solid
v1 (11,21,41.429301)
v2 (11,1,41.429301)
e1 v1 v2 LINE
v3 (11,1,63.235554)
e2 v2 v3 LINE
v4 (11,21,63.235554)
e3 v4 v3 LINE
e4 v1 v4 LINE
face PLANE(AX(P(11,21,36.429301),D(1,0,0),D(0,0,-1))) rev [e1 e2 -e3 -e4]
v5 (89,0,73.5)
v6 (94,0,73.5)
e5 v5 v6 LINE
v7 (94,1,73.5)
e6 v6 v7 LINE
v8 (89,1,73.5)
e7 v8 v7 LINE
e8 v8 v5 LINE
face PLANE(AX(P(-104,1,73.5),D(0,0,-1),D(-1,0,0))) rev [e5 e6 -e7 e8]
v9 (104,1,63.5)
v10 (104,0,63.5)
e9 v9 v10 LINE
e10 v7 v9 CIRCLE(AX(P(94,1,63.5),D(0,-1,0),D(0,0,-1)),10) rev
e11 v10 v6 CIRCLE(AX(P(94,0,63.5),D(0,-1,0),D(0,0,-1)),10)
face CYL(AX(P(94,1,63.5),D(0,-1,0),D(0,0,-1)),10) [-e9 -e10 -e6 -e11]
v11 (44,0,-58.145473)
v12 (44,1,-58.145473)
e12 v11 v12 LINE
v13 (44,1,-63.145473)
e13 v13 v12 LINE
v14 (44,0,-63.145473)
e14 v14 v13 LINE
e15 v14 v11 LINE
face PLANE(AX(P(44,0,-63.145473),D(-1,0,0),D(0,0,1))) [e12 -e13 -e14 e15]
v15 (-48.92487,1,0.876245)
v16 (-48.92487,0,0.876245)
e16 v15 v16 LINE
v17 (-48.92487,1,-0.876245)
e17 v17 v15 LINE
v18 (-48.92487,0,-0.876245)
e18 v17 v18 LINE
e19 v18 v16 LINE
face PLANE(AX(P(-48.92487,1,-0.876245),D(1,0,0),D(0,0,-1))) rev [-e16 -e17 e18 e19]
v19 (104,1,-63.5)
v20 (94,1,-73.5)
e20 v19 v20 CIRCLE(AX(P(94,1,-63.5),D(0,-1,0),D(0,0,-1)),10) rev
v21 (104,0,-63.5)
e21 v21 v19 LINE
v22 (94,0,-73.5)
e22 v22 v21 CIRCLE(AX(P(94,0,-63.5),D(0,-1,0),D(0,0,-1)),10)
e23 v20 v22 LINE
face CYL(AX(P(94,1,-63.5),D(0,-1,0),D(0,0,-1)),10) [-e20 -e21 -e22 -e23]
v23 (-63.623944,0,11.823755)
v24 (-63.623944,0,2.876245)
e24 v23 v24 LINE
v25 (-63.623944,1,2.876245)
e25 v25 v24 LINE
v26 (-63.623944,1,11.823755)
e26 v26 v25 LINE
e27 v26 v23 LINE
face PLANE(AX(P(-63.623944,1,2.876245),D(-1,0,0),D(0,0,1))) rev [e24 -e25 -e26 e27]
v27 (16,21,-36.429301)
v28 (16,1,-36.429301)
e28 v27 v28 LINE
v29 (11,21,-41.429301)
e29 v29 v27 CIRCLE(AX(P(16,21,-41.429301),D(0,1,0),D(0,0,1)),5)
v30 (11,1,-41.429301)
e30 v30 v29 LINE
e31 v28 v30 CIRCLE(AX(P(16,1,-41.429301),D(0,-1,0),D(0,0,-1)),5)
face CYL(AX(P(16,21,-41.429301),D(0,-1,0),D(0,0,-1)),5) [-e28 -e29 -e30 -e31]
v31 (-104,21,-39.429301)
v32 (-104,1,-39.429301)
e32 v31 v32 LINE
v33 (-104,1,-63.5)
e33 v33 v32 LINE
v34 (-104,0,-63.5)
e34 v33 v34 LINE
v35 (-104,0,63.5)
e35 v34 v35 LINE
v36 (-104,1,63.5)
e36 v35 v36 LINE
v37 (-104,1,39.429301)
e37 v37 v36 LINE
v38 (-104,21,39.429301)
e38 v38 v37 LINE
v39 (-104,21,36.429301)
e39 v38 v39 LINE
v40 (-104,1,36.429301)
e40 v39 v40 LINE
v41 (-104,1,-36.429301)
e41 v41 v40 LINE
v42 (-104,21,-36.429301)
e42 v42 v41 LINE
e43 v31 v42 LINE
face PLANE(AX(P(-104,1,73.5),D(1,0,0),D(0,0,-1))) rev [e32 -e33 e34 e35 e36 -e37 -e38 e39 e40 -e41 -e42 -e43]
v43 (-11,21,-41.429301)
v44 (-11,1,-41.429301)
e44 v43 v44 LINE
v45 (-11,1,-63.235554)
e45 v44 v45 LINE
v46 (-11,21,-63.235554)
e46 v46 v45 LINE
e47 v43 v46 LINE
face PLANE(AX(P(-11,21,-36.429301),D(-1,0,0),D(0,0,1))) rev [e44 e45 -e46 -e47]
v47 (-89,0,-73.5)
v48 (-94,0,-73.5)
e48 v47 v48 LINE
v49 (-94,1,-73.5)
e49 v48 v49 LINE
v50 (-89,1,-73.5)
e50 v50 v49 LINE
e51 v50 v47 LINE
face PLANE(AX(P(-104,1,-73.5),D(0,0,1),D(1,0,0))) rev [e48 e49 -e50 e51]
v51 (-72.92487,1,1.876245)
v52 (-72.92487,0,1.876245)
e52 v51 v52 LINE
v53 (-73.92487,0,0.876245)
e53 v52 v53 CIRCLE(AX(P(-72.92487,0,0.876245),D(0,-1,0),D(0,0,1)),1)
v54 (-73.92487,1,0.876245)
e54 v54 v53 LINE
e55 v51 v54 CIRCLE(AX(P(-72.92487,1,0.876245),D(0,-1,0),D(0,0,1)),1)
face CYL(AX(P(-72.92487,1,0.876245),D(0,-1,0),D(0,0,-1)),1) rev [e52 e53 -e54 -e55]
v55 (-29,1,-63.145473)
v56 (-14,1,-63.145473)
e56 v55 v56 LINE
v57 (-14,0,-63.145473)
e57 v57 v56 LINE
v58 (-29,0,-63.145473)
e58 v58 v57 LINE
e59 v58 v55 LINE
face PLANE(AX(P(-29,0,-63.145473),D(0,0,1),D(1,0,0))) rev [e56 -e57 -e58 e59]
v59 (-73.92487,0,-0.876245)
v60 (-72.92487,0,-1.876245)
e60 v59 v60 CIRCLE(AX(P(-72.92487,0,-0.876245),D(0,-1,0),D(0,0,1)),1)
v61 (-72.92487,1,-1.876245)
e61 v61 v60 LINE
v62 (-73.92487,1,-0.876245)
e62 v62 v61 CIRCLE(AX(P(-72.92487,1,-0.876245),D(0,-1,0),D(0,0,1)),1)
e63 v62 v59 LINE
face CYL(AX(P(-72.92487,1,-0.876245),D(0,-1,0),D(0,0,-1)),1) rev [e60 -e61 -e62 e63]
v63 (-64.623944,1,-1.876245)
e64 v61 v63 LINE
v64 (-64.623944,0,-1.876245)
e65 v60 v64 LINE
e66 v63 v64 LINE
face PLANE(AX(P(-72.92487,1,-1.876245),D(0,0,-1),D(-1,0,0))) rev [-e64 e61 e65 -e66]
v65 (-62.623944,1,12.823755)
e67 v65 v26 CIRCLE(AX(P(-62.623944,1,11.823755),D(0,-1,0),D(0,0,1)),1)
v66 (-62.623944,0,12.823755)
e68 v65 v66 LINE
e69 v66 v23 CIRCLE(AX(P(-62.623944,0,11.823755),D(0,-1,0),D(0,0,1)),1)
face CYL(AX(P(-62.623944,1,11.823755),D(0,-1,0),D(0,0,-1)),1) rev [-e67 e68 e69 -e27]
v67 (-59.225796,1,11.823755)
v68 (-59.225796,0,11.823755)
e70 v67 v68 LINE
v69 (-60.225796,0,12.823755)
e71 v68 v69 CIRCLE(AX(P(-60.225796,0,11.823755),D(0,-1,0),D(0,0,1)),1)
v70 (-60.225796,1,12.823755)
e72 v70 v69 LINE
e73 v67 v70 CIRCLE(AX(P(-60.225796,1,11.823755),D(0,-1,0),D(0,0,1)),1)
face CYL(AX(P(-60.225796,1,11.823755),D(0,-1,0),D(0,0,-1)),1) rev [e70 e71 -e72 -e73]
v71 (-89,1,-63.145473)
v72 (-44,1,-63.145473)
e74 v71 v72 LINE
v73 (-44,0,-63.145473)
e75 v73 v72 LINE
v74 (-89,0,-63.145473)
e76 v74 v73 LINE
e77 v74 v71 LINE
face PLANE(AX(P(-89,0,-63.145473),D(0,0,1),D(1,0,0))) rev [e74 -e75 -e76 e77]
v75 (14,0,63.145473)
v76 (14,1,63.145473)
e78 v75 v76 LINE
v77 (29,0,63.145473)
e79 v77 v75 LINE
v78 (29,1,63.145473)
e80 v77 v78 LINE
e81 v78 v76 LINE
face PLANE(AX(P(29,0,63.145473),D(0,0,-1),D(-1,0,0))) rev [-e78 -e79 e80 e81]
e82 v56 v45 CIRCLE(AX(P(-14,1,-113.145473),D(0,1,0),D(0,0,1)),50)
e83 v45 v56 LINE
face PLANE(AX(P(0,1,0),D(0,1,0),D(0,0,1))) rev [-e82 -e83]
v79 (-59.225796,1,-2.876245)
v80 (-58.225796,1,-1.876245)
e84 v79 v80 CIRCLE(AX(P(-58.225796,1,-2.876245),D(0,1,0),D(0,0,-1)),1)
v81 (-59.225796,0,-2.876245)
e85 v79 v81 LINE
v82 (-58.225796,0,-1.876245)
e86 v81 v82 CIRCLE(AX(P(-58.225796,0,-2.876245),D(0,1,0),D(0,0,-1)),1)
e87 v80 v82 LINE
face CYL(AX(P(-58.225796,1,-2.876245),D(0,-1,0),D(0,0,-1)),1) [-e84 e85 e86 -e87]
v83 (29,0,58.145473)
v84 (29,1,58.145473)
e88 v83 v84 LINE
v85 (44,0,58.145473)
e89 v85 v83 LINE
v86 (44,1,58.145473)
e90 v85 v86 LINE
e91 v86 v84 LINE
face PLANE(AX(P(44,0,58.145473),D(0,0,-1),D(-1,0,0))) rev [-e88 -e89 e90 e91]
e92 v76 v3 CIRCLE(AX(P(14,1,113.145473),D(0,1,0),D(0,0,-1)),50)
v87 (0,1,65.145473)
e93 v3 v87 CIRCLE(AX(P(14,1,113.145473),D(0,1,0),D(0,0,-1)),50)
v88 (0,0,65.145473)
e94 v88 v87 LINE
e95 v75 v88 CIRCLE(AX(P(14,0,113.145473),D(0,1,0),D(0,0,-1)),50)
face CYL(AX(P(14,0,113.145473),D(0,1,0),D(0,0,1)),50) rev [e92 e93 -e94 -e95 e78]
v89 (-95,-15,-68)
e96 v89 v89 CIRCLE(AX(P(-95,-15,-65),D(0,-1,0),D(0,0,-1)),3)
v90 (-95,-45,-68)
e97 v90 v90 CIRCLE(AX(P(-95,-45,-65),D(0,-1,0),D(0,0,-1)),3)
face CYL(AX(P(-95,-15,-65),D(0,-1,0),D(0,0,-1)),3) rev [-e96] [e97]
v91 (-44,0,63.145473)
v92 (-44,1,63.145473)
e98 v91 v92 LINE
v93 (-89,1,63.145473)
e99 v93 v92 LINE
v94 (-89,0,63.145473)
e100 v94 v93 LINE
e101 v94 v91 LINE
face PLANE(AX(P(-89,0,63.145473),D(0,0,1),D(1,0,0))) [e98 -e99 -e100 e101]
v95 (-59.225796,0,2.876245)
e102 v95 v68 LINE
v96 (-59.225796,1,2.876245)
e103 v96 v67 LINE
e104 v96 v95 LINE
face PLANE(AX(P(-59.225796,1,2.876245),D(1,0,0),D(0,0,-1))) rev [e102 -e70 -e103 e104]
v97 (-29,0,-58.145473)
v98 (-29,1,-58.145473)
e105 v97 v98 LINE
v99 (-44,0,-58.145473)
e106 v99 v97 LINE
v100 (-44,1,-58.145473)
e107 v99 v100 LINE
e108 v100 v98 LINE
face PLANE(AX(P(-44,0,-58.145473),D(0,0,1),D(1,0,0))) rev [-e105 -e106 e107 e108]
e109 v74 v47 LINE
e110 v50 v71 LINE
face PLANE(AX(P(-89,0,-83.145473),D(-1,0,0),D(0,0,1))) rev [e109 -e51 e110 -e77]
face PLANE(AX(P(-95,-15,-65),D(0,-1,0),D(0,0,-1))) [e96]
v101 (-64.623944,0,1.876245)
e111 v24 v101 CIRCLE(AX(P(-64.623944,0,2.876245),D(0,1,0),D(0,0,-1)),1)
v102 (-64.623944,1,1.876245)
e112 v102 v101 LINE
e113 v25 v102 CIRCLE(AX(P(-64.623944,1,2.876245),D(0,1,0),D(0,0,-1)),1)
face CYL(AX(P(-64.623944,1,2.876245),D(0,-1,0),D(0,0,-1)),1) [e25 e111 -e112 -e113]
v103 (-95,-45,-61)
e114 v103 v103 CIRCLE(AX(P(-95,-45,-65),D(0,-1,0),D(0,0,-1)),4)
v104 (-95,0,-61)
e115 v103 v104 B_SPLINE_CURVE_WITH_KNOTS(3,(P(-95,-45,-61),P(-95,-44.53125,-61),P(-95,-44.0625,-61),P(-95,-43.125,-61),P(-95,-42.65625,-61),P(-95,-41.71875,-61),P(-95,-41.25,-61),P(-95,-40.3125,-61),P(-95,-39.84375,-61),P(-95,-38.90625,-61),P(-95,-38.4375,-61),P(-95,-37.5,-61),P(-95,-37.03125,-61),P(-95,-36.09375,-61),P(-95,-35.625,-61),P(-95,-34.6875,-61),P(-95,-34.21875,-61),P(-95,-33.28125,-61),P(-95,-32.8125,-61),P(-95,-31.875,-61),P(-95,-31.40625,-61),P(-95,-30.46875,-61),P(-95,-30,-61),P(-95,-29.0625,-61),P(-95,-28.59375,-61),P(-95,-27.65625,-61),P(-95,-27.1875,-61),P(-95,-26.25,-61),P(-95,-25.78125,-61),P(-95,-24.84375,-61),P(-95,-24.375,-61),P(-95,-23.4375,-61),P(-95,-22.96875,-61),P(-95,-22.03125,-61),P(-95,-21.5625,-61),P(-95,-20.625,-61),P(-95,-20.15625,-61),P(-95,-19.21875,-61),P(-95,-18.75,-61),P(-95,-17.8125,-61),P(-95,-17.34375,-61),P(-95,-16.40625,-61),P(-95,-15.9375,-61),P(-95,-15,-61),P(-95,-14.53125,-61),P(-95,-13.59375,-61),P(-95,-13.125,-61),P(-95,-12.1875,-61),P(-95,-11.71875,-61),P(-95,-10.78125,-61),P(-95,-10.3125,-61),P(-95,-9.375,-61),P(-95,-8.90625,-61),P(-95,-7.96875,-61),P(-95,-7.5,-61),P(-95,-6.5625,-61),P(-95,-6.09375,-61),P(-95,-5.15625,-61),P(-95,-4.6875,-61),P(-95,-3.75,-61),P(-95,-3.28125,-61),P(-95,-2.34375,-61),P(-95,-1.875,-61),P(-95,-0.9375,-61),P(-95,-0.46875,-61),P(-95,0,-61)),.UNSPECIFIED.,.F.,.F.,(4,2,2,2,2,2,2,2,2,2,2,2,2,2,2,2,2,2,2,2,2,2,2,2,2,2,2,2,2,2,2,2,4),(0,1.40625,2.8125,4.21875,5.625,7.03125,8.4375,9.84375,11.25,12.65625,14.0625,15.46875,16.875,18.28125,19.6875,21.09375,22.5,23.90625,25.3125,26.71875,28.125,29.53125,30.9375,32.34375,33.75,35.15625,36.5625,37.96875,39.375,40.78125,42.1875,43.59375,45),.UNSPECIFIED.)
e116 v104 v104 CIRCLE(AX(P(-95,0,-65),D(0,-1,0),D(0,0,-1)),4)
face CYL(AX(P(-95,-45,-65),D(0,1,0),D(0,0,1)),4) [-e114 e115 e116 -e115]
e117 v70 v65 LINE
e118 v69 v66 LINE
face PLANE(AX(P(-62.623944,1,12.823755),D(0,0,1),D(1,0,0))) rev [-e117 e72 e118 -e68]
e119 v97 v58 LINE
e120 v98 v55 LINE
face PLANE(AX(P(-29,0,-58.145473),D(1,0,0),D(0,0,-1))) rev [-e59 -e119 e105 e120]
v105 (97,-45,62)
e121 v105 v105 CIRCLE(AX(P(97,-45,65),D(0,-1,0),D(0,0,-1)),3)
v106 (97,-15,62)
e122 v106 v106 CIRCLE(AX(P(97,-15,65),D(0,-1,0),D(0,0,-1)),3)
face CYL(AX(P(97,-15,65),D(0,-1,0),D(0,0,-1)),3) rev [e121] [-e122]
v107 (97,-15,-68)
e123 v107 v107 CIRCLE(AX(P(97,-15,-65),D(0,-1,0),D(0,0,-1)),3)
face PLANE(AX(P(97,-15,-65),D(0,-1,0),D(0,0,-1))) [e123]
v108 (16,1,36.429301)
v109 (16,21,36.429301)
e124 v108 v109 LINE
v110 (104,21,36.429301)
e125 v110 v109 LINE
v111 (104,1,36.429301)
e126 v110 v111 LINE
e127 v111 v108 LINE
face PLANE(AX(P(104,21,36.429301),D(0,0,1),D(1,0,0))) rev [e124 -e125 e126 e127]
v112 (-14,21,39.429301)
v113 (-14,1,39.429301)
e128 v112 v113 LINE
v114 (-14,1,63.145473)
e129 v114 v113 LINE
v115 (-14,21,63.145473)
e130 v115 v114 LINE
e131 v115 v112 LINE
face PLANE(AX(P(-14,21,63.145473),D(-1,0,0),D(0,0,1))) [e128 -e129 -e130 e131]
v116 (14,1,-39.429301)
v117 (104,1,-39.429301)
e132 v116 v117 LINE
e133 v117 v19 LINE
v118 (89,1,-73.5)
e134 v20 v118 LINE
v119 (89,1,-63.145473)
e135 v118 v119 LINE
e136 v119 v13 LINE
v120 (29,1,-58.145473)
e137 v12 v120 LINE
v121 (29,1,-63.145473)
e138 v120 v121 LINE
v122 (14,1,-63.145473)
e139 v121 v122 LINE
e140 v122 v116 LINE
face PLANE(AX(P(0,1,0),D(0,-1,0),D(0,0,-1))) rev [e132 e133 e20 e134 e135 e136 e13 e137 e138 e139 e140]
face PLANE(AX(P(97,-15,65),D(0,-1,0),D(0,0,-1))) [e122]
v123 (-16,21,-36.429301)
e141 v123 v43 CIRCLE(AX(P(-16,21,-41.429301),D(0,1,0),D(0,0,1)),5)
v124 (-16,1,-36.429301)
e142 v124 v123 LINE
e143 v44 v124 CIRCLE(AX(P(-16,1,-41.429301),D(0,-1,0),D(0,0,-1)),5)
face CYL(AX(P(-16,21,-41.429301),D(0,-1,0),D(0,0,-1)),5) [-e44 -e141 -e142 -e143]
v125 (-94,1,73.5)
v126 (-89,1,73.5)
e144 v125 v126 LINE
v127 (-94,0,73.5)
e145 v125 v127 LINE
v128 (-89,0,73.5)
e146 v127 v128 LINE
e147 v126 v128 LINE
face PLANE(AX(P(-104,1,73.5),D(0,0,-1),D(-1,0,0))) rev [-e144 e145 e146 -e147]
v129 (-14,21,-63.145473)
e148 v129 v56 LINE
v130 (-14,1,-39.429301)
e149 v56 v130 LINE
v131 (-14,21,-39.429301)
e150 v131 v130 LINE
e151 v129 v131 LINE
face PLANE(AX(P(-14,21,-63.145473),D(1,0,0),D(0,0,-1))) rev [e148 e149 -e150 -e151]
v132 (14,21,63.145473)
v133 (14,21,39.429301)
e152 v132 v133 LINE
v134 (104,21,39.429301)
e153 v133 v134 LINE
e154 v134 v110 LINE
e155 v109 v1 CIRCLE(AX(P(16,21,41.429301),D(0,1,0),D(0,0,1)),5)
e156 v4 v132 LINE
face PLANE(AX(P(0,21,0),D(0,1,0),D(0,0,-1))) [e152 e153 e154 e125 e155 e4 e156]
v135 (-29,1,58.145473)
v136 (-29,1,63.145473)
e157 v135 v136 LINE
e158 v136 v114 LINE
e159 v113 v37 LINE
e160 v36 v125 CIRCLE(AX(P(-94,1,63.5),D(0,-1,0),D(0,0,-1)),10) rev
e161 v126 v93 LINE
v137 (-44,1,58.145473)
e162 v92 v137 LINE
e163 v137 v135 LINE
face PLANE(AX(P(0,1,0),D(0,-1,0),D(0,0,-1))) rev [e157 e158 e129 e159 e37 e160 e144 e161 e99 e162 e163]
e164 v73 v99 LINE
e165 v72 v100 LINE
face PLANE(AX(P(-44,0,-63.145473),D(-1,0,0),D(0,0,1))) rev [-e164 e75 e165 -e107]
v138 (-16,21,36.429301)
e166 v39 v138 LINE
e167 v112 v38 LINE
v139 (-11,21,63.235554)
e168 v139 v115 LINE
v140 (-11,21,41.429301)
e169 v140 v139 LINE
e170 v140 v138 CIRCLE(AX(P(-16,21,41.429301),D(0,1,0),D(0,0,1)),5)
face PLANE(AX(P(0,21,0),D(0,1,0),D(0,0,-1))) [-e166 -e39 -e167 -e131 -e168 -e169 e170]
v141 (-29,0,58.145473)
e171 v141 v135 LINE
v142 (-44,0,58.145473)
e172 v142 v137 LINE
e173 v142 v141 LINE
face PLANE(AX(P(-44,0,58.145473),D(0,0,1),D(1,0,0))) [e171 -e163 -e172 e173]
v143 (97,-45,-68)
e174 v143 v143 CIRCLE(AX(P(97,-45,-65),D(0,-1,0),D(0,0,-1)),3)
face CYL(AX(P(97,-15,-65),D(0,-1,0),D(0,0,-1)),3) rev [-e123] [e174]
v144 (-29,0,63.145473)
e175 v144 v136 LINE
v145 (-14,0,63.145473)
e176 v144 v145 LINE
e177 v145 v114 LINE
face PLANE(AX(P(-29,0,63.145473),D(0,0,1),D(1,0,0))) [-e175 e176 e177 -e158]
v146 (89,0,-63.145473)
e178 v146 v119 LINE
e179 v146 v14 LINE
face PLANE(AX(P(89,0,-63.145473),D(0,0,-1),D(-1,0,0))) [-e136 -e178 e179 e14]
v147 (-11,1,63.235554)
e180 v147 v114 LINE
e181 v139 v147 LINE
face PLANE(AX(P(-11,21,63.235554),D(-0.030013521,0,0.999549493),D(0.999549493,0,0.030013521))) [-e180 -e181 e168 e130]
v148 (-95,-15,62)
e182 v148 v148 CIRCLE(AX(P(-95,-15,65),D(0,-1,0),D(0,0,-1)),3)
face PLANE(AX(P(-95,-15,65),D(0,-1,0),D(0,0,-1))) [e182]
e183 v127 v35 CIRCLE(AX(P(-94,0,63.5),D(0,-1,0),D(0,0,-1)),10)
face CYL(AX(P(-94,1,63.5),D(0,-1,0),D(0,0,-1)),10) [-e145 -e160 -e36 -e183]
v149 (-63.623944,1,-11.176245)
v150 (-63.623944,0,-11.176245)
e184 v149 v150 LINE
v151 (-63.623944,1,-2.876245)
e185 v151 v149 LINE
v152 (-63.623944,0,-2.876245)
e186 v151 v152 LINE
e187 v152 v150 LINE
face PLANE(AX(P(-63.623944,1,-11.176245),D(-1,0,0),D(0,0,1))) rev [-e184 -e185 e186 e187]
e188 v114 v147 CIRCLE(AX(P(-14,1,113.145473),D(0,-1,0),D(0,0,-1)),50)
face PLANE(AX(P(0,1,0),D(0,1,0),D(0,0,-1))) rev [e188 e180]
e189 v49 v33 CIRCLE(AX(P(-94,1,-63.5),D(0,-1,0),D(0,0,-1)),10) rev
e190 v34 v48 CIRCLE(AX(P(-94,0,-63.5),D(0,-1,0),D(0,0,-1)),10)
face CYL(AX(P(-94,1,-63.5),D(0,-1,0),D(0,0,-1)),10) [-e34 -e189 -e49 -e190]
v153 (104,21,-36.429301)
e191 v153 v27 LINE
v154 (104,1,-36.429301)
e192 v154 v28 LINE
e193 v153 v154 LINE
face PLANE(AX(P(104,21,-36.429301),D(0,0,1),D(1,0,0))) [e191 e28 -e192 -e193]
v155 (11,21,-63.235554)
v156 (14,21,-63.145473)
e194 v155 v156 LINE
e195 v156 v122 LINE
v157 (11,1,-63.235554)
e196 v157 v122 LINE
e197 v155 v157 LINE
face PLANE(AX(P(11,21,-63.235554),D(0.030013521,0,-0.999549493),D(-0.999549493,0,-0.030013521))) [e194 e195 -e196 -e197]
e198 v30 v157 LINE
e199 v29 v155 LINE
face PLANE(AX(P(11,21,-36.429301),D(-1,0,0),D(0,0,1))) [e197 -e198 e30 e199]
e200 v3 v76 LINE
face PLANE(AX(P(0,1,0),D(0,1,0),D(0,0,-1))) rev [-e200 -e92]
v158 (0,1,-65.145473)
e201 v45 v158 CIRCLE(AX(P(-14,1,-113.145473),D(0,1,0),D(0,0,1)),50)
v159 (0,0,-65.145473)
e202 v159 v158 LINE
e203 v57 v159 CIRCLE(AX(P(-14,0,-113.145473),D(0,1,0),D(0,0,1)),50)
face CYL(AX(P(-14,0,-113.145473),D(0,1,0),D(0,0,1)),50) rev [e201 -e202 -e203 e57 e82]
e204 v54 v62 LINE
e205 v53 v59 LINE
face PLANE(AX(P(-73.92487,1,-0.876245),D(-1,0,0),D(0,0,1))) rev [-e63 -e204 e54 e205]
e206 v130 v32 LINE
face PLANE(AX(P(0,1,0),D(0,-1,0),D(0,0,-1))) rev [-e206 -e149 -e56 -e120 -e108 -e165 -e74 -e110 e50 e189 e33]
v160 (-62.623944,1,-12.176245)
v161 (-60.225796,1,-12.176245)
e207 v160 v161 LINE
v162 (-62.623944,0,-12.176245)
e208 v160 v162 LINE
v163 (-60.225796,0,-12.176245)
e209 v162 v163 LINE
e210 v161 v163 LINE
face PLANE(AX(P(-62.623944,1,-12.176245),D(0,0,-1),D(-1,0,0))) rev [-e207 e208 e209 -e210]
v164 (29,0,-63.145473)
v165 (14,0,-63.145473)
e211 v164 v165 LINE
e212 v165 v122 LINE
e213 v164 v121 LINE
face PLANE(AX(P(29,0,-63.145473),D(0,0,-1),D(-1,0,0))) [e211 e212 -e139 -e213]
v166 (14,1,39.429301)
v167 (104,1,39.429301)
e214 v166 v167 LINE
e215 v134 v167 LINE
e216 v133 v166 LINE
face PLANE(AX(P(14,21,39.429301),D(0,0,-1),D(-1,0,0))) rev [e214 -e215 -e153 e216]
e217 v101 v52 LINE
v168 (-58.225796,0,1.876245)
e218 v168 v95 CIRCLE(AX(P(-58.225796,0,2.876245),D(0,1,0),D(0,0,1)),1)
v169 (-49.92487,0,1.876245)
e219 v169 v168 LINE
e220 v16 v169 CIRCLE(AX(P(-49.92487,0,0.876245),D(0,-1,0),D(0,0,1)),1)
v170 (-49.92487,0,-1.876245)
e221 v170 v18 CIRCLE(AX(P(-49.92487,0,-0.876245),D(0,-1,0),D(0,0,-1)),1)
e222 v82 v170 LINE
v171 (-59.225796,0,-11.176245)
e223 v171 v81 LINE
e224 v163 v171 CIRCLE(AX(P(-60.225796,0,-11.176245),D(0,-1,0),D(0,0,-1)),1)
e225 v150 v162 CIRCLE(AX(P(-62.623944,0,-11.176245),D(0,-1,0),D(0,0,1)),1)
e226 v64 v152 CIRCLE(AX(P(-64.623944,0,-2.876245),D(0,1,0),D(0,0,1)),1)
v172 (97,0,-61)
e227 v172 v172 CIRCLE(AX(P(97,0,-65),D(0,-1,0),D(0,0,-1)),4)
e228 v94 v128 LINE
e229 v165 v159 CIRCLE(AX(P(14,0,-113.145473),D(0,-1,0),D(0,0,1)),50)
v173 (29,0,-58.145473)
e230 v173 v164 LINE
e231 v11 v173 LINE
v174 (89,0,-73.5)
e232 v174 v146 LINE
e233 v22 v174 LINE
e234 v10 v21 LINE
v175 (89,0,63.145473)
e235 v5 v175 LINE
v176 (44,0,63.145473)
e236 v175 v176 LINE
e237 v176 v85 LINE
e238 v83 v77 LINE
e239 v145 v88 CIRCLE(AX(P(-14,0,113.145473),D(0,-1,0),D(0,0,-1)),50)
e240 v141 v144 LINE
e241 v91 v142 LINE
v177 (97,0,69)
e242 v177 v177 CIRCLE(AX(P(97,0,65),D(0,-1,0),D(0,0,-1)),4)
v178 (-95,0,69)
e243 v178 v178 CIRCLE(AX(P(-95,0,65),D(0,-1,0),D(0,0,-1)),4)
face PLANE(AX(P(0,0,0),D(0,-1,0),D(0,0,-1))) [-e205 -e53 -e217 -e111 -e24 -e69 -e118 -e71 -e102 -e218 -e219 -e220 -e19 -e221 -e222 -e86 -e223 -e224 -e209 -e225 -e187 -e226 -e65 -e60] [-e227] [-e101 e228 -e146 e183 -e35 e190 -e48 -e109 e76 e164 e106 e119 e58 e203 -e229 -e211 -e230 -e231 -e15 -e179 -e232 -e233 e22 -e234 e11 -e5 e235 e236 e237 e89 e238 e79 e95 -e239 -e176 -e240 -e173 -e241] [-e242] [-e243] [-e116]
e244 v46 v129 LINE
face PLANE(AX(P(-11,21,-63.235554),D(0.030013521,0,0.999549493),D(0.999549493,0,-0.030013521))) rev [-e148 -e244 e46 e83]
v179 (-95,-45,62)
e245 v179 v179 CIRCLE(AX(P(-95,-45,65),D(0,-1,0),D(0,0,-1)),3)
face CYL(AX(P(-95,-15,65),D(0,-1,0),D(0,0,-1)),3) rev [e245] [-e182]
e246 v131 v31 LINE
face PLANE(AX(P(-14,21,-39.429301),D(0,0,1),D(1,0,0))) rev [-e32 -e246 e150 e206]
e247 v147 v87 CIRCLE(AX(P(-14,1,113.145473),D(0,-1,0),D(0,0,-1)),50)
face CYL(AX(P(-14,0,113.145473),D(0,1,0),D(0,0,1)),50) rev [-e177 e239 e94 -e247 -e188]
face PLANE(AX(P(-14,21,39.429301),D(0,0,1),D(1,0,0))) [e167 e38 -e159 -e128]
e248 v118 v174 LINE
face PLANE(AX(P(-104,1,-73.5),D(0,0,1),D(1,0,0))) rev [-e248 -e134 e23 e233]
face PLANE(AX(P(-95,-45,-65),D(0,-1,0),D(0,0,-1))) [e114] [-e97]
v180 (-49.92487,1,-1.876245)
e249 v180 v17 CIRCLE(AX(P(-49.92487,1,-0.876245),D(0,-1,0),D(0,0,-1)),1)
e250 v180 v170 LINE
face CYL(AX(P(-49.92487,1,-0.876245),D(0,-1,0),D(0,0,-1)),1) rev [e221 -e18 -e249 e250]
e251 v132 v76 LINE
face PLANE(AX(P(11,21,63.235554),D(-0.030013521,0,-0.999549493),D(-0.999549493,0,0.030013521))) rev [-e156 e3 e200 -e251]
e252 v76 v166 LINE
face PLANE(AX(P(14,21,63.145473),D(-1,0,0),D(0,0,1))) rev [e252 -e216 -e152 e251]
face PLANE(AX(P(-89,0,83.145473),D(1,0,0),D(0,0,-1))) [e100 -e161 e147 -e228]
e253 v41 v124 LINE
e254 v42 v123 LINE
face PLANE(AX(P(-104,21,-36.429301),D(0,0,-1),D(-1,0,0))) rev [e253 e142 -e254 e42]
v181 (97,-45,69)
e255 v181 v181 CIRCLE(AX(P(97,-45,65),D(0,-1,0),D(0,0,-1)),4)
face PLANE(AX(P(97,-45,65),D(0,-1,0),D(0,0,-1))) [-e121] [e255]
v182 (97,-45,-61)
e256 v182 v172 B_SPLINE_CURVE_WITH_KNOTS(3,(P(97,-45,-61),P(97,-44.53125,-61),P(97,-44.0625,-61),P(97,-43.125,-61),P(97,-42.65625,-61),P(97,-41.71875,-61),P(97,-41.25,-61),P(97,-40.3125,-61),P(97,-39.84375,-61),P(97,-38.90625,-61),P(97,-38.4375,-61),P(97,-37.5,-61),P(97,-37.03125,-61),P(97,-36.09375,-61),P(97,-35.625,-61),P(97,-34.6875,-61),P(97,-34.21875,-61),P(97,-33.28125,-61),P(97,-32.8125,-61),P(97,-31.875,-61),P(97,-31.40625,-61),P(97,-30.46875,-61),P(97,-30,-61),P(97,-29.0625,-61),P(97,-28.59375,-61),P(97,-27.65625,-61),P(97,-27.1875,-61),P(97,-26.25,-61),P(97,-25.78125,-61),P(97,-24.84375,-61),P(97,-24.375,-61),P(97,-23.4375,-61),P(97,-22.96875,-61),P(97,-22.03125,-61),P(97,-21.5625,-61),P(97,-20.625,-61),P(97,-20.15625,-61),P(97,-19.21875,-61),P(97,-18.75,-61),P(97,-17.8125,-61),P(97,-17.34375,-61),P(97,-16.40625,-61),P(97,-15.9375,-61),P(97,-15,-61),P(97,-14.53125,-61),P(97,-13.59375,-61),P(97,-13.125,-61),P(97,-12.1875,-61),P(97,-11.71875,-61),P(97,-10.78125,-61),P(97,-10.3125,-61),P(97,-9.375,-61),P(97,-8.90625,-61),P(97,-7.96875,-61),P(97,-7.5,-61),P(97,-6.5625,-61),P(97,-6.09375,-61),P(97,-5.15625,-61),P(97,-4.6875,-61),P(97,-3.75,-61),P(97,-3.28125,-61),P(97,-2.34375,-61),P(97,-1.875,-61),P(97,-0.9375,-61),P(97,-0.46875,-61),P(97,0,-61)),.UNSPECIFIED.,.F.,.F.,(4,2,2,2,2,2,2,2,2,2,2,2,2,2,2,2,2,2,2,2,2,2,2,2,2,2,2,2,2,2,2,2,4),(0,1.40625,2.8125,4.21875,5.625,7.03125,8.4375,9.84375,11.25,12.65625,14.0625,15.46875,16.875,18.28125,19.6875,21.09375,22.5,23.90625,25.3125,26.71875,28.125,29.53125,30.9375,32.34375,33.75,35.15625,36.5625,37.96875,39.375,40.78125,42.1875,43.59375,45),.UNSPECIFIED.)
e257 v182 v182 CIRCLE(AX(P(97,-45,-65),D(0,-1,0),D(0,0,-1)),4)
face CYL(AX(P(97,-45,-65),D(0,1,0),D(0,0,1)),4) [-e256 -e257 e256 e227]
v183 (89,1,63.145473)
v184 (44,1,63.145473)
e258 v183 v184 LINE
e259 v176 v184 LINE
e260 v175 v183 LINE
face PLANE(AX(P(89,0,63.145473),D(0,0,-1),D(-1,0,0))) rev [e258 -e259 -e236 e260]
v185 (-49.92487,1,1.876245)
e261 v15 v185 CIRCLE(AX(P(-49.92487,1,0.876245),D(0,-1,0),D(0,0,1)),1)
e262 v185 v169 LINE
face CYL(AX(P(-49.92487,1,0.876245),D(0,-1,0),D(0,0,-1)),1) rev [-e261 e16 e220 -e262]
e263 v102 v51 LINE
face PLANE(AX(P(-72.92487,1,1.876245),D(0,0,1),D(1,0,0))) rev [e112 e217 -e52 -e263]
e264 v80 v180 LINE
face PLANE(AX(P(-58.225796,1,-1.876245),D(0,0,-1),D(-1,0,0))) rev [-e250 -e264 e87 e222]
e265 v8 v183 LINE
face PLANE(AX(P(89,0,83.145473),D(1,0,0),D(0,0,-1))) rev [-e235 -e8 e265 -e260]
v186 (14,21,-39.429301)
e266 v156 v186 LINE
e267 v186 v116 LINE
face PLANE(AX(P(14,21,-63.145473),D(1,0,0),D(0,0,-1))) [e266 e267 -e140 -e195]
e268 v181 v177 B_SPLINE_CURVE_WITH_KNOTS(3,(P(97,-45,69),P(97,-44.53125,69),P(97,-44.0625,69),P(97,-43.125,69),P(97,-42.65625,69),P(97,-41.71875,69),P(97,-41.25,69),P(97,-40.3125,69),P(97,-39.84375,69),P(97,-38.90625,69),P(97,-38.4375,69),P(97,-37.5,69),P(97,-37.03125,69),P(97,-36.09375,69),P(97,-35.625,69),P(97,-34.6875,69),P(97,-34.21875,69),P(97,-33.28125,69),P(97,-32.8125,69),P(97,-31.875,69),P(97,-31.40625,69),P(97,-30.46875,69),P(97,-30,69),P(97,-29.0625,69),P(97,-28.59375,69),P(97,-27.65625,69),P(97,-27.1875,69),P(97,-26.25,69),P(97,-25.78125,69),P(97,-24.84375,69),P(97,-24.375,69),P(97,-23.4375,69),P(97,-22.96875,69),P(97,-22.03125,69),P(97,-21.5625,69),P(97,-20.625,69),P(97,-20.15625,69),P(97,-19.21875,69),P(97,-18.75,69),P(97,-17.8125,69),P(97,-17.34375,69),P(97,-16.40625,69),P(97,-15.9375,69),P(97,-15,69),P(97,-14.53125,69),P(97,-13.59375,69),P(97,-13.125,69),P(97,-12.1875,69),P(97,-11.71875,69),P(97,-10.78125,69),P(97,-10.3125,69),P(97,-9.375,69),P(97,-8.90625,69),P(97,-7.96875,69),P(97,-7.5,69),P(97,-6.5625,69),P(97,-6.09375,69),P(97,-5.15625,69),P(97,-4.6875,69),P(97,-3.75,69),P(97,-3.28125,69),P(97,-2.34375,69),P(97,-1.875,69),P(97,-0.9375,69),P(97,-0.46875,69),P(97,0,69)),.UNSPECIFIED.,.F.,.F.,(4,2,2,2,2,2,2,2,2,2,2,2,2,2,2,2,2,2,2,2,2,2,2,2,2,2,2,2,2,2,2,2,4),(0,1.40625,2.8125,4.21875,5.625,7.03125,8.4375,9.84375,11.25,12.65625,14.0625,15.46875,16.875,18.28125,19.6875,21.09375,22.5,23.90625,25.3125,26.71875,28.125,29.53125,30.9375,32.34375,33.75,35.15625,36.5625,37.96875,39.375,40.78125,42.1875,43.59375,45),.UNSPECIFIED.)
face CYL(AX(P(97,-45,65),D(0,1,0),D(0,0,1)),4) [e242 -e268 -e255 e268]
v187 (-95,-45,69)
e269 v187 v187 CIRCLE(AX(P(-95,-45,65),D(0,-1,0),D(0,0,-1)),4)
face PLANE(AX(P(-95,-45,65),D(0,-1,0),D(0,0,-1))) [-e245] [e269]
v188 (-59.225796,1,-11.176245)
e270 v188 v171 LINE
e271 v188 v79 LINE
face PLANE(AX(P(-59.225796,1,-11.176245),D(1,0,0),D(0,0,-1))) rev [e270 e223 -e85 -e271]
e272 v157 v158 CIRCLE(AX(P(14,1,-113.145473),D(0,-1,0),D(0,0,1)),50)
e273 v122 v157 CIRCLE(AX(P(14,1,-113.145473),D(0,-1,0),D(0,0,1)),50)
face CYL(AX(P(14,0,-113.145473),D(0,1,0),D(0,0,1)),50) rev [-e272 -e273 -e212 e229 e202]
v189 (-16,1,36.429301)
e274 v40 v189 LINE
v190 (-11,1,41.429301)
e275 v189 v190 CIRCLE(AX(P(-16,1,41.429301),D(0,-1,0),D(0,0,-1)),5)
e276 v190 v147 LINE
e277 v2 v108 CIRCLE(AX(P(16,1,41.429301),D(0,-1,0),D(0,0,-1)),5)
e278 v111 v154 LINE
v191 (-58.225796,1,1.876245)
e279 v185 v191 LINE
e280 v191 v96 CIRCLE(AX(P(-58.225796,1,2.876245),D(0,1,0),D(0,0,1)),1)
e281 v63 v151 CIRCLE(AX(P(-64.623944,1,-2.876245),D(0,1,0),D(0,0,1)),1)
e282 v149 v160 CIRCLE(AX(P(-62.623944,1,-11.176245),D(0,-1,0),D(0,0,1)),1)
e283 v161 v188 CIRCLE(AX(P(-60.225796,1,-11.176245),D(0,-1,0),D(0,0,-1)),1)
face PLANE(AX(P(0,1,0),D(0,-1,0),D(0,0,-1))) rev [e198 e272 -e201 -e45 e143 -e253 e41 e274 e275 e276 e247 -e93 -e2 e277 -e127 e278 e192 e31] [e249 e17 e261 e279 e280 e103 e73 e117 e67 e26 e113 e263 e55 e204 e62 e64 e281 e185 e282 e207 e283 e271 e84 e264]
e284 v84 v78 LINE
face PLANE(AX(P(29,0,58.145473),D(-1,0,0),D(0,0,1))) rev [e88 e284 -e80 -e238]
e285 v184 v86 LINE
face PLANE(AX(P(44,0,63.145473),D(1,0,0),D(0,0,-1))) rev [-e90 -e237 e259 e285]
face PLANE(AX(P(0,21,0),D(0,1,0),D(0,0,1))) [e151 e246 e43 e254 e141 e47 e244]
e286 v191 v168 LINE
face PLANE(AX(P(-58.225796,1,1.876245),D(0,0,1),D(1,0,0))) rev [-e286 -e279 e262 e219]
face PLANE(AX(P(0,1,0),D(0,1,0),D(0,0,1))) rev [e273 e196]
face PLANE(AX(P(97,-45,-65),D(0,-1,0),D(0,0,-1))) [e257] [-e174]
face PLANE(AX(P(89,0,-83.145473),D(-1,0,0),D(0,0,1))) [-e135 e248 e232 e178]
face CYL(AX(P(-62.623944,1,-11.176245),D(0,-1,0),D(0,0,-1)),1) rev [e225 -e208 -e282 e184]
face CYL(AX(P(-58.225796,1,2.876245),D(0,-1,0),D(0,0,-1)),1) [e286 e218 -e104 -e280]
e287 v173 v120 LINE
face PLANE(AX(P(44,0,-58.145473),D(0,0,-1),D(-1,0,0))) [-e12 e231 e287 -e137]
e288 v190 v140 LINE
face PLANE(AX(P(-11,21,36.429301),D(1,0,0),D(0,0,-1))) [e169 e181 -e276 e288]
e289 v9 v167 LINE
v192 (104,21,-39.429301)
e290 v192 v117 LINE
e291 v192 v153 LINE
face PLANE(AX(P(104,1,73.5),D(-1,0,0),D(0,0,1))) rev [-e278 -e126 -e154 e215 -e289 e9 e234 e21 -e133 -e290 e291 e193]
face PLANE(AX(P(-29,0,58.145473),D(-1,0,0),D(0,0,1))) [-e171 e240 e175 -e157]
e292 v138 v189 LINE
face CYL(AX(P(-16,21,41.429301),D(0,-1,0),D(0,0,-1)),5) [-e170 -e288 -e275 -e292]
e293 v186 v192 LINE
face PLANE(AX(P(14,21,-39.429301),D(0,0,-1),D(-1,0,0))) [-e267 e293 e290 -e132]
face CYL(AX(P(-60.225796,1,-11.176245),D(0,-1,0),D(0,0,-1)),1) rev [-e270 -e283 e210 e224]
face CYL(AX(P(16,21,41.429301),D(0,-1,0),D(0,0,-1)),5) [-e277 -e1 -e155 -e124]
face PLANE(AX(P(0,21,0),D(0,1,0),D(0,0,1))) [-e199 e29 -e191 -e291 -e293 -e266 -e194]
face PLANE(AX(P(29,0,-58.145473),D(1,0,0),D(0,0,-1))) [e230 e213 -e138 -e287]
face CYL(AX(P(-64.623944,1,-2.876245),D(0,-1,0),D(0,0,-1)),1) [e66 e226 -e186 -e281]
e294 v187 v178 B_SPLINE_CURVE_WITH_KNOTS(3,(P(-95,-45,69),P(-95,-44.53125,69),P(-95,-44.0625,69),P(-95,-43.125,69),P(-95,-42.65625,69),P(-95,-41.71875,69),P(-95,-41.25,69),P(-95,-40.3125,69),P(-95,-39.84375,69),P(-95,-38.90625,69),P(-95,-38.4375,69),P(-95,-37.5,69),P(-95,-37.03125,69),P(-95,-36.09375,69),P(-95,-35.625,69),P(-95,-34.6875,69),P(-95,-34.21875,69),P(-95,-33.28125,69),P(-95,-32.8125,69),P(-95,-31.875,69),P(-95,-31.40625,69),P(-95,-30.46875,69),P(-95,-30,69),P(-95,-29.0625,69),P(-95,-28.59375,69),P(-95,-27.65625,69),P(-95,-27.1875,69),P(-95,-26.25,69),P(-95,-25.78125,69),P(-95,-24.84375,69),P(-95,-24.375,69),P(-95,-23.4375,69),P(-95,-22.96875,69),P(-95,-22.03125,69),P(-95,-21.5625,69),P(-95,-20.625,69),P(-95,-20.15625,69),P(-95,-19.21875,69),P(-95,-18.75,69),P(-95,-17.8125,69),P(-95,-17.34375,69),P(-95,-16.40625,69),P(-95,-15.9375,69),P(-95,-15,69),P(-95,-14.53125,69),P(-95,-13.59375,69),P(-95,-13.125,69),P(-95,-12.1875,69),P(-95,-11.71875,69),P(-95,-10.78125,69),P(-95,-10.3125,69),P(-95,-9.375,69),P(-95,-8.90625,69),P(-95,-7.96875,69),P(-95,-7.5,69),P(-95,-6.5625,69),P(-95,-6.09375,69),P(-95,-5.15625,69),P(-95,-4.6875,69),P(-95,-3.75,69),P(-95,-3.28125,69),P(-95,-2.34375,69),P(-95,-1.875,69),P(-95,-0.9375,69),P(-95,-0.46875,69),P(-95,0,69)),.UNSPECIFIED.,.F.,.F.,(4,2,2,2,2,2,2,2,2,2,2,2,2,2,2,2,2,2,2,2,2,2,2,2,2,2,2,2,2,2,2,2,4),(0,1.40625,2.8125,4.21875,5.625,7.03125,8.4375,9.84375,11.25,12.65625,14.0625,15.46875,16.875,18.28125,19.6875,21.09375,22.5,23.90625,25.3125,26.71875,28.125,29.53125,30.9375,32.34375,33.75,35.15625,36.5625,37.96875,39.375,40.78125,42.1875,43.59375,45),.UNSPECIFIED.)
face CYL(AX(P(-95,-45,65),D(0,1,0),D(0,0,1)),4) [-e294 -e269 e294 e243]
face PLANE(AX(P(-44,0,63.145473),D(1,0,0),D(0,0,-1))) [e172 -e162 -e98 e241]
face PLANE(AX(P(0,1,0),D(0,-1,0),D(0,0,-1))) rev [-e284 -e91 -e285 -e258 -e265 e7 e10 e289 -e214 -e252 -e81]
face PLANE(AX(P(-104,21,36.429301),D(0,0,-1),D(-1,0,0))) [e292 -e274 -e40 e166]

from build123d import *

# Parameters (mm, degrees)
SKETCH1_W            = 208
SKETCH1_H            = 147
BOSS_EXTRUDE1_DEPTH  = 1
CUT_EXTRUDE1_DEPTH   = 128.354819304
MIRROR2_COPY_1_DEPTH = 128.354819304
FILLET1_R            = 10
CUT_EXTRUDE2_DEPTH   = 128.354819304
BOSS_EXTRUDE2_DEPTH  = 20
FILLET2_R            = 5
FILLET2_OF_MIRROR3_R = 5
MIRROR4_START        = 1
MIRROR4_DEPTH        = 20
SKETCH7_R            = 4
BOSS_EXTRUDE3_DEPTH  = 45
SKETCH8_R            = 3
CUT_EXTRUDE4_DEPTH   = 30


# Read off the part's stored shape, not the designer's step: Mirror4
with BuildPart() as part:
    # Sketch1 → Boss-Extrude1 (new body)
    with BuildSketch(Plane(origin=(0, 0, 0), x_dir=(1, 0, 0), z_dir=(0, 1, 0))):
        Rectangle(SKETCH1_W, SKETCH1_H)
    extrude(amount=BOSS_EXTRUDE1_DEPTH)

    # Sketch3 → Cut-Extrude1 (cut, through all)
    with BuildSketch(Plane(origin=(0, 1, 0), x_dir=(1, 0, 0), z_dir=(0, 1, 0))):
        with BuildLine():
            Line((-89, 83.145473262), (-89, 63.145473262))
            Line((-89, 63.145473262), (-44, 63.145473262))
            Line((-44, 63.145473262), (-44, 58.145473262))
            Line((-44, 58.145473262), (-29, 58.145473262))
            Line((-29, 58.145473262), (-29, 63.145473262))
            Line((-29, 63.145473262), (-14, 63.145473262))
            ThreePointArc((-14, 63.145473262), (-6.928932188, 63.647998579), (0, 65.145473262))
            Line((0, 65.145473262), (0, 85.145473262))
            Line((0, 85.145473262), (-89, 85.145473262))
            Line((-89, 85.145473262), (-89, 83.145473262))
        make_face()
    cut_extrude1 = extrude(amount=-CUT_EXTRUDE1_DEPTH, mode=Mode.SUBTRACT)

    # Mirror1: Cut-Extrude1 across plane
    add(cut_extrude1.mirror(Plane.XY), mode=Mode.SUBTRACT)

    # Mirror2: Cut-Extrude1 across plane
    add(cut_extrude1.mirror(Plane(origin=(0, 0, 0), x_dir=(0, 0, 1), z_dir=(1, 0, 0))), mode=Mode.SUBTRACT)

    # Mirror2 copy 1 sketch → Mirror2 copy 1 (cut, through all)
    with BuildSketch(Plane(origin=(0, 1, 0), x_dir=(-1, 0, 0), z_dir=(0, 1, 0))):
        with BuildLine():
            Line((-89, 83.145473262), (-89, 63.145473262))
            Line((-89, 63.145473262), (-44, 63.145473262))
            Line((-44, 63.145473262), (-44, 58.145473262))
            Line((-44, 58.145473262), (-29, 58.145473262))
            Line((-29, 58.145473262), (-29, 63.145473262))
            Line((-29, 63.145473262), (-14, 63.145473262))
            ThreePointArc((-14, 63.145473262), (-6.928932188, 63.647998579), (0, 65.145473262))
            Line((0, 65.145473262), (0, 85.145473262))
            Line((0, 85.145473262), (-89, 85.145473262))
            Line((-89, 85.145473262), (-89, 83.145473262))
        make_face()
    extrude(amount=-MIRROR2_COPY_1_DEPTH, mode=Mode.SUBTRACT)

    # Fillet1
    fillet1_edges = [part.edges().sort_by_distance(p)[0] for p in [
        (104, 0.5, 73.5),
        (-104, 0.5, 73.5),
        (-104, 0.5, -73.5),
        (104, 0.5, -73.5),
    ]]
    fillet(fillet1_edges, radius=FILLET1_R)

    # Sketch4 → Cut-Extrude2 (cut, through all)
    with BuildSketch(Plane.XZ):
        with BuildLine():
            Line((-58.225796132, 1.876244538), (-49.924870206, 1.876244538))
            ThreePointArc((-49.924870206, 1.876244538), (-49.217763425, 1.583351319), (-48.924870206, 0.876244538))
            Line((-48.924870206, 0.876244538), (-48.924870206, -0.876244538))
            ThreePointArc((-48.924870206, -0.876244538), (-49.217763425, -1.583351319), (-49.924870206, -1.876244538))
            Line((-49.924870206, -1.876244538), (-58.225796132, -1.876244538))
            ThreePointArc((-58.225796132, -1.876244538), (-58.932902913, -2.169137757), (-59.225796132, -2.876244538))
            Line((-59.225796132, -2.876244538), (-59.225796132, -11.176244538))
            ThreePointArc((-59.225796132, -11.176244538), (-59.518689351, -11.883351319), (-60.225796132, -12.176244538))
            Line((-60.225796132, -12.176244538), (-62.62394428, -12.176244538))
            ThreePointArc((-62.62394428, -12.176244538), (-63.331051061, -11.883351319), (-63.62394428, -11.176244538))
            Line((-63.62394428, -11.176244538), (-63.62394428, -2.876244538))
            ThreePointArc((-63.62394428, -2.876244538), (-63.916837499, -2.169137757), (-64.62394428, -1.876244538))
            Line((-64.62394428, -1.876244538), (-72.924870206, -1.876244538))
            ThreePointArc((-72.924870206, -1.876244538), (-73.631976987, -1.583351319), (-73.924870206, -0.876244538))
            Line((-73.924870206, -0.876244538), (-73.924870206, 0.876244538))
            ThreePointArc((-73.924870206, 0.876244538), (-73.631976987, 1.583351319), (-72.924870206, 1.876244538))
            Line((-72.924870206, 1.876244538), (-64.62394428, 1.876244538))
            ThreePointArc((-64.62394428, 1.876244538), (-63.916837499, 2.169137757), (-63.62394428, 2.876244538))
            Line((-63.62394428, 2.876244538), (-63.62394428, 11.823755462))
            ThreePointArc((-63.62394428, 11.823755462), (-63.331051061, 12.530862243), (-62.62394428, 12.823755462))
            Line((-62.62394428, 12.823755462), (-60.225796132, 12.823755462))
            ThreePointArc((-60.225796132, 12.823755462), (-59.518689351, 12.530862243), (-59.225796132, 11.823755462))
            Line((-59.225796132, 11.823755462), (-59.225796132, 2.876244538))
            ThreePointArc((-59.225796132, 2.876244538), (-58.932902913, 2.169137757), (-58.225796132, 1.876244538))
        make_face()
    extrude(amount=-CUT_EXTRUDE2_DEPTH, mode=Mode.SUBTRACT)

    # Sketch5 → Boss-Extrude2 (add)
    with BuildSketch(Plane(origin=(0, 1, 0), x_dir=(1, 0, 0), z_dir=(0, 1, 0))):
        Polygon((-104, 36.429300806), (-11, 36.429300806), (-11, 63.235554408), (-14, 63.145473262), (-14, 39.429300806), (-104, 39.429300806), align=None)
    boss_extrude2 = extrude(amount=BOSS_EXTRUDE2_DEPTH)

    # Fillet2
    fillet2_edges = [part.edges().sort_by_distance(p)[0] for p in [
        (-11, 11, -36.429300806),
    ]]
    fillet(fillet2_edges, radius=FILLET2_R)

    # Mirror3: Boss-Extrude2 across plane
    add(boss_extrude2.mirror(Plane.XY))

    # Fillet2 of Mirror3
    fillet2_of_mirror3_edges = [part.edges().sort_by_distance(p)[0] for p in [
        (-11, 11, 36.429300806),
    ]]
    fillet(fillet2_of_mirror3_edges, radius=FILLET2_OF_MIRROR3_R)

    # Mirror4 outline → Mirror4 (add)
    with BuildSketch(Plane(origin=(0, 0, 0), x_dir=(1, 0, 0), z_dir=(0, 1, 0)).offset(MIRROR4_START)):
        with BuildLine():
            Line((104, -39.429300806), (104, -36.429300806))
            Line((104, -36.429300806), (16, -36.429300806))
            ThreePointArc((16, -36.429300806), (12.464466094, -37.8937669), (11, -41.429300806))
            Line((11, -41.429300806), (11, -63.235554408))
            Line((11, -63.235554408), (14, -63.145473262))
            Line((14, -63.145473262), (14, -39.429300806))
            Line((14, -39.429300806), (104, -39.429300806))
        make_face()
        with BuildLine():
            Line((104, 36.429300806), (104, 39.429300806))
            Line((104, 39.429300806), (14, 39.429300806))
            Line((14, 39.429300806), (14, 63.145473262))
            Line((14, 63.145473262), (11, 63.235554408))
            Line((11, 63.235554408), (11, 41.429300806))
            ThreePointArc((11, 41.429300806), (12.464466094, 37.8937669), (16, 36.429300806))
            Line((16, 36.429300806), (104, 36.429300806))
        make_face()
    extrude(amount=MIRROR4_DEPTH)

    # Sketch7 → Boss-Extrude3 (add)
    with BuildSketch(Plane.XZ):
        with Locations(Location((97, 65, 0), (0, 0, 90))):
            Circle(SKETCH7_R)
        with Locations(Location((-95, 65, 0), (0, 0, 90))):
            Circle(SKETCH7_R)
        with Locations(Location((-95, -65, 0), (0, 0, 90))):
            Circle(SKETCH7_R)
        with Locations(Location((97, -65, 0), (0, 0, 90))):
            Circle(SKETCH7_R)
    extrude(amount=BOSS_EXTRUDE3_DEPTH)

    # Sketch8 → Cut-Extrude4 (cut)
    with BuildSketch(Plane(origin=(0, -45, 0), x_dir=(-1, 0, 0), z_dir=(0, -1, 0))):
        with Locations(Location((95, 65, 0), (0, 0, 90))):
            Circle(SKETCH8_R)
        with Locations(Location((95, -65, 0), (0, 0, 90))):
            Circle(SKETCH8_R)
        with Locations(Location((-97, -65, 0), (0, 0, 90))):
            Circle(SKETCH8_R)
        with Locations(Location((-97, 65, 0), (0, 0, 90))):
            Circle(SKETCH8_R)
    extrude(amount=-CUT_EXTRUDE4_DEPTH, mode=Mode.SUBTRACT)


solid = part.part
